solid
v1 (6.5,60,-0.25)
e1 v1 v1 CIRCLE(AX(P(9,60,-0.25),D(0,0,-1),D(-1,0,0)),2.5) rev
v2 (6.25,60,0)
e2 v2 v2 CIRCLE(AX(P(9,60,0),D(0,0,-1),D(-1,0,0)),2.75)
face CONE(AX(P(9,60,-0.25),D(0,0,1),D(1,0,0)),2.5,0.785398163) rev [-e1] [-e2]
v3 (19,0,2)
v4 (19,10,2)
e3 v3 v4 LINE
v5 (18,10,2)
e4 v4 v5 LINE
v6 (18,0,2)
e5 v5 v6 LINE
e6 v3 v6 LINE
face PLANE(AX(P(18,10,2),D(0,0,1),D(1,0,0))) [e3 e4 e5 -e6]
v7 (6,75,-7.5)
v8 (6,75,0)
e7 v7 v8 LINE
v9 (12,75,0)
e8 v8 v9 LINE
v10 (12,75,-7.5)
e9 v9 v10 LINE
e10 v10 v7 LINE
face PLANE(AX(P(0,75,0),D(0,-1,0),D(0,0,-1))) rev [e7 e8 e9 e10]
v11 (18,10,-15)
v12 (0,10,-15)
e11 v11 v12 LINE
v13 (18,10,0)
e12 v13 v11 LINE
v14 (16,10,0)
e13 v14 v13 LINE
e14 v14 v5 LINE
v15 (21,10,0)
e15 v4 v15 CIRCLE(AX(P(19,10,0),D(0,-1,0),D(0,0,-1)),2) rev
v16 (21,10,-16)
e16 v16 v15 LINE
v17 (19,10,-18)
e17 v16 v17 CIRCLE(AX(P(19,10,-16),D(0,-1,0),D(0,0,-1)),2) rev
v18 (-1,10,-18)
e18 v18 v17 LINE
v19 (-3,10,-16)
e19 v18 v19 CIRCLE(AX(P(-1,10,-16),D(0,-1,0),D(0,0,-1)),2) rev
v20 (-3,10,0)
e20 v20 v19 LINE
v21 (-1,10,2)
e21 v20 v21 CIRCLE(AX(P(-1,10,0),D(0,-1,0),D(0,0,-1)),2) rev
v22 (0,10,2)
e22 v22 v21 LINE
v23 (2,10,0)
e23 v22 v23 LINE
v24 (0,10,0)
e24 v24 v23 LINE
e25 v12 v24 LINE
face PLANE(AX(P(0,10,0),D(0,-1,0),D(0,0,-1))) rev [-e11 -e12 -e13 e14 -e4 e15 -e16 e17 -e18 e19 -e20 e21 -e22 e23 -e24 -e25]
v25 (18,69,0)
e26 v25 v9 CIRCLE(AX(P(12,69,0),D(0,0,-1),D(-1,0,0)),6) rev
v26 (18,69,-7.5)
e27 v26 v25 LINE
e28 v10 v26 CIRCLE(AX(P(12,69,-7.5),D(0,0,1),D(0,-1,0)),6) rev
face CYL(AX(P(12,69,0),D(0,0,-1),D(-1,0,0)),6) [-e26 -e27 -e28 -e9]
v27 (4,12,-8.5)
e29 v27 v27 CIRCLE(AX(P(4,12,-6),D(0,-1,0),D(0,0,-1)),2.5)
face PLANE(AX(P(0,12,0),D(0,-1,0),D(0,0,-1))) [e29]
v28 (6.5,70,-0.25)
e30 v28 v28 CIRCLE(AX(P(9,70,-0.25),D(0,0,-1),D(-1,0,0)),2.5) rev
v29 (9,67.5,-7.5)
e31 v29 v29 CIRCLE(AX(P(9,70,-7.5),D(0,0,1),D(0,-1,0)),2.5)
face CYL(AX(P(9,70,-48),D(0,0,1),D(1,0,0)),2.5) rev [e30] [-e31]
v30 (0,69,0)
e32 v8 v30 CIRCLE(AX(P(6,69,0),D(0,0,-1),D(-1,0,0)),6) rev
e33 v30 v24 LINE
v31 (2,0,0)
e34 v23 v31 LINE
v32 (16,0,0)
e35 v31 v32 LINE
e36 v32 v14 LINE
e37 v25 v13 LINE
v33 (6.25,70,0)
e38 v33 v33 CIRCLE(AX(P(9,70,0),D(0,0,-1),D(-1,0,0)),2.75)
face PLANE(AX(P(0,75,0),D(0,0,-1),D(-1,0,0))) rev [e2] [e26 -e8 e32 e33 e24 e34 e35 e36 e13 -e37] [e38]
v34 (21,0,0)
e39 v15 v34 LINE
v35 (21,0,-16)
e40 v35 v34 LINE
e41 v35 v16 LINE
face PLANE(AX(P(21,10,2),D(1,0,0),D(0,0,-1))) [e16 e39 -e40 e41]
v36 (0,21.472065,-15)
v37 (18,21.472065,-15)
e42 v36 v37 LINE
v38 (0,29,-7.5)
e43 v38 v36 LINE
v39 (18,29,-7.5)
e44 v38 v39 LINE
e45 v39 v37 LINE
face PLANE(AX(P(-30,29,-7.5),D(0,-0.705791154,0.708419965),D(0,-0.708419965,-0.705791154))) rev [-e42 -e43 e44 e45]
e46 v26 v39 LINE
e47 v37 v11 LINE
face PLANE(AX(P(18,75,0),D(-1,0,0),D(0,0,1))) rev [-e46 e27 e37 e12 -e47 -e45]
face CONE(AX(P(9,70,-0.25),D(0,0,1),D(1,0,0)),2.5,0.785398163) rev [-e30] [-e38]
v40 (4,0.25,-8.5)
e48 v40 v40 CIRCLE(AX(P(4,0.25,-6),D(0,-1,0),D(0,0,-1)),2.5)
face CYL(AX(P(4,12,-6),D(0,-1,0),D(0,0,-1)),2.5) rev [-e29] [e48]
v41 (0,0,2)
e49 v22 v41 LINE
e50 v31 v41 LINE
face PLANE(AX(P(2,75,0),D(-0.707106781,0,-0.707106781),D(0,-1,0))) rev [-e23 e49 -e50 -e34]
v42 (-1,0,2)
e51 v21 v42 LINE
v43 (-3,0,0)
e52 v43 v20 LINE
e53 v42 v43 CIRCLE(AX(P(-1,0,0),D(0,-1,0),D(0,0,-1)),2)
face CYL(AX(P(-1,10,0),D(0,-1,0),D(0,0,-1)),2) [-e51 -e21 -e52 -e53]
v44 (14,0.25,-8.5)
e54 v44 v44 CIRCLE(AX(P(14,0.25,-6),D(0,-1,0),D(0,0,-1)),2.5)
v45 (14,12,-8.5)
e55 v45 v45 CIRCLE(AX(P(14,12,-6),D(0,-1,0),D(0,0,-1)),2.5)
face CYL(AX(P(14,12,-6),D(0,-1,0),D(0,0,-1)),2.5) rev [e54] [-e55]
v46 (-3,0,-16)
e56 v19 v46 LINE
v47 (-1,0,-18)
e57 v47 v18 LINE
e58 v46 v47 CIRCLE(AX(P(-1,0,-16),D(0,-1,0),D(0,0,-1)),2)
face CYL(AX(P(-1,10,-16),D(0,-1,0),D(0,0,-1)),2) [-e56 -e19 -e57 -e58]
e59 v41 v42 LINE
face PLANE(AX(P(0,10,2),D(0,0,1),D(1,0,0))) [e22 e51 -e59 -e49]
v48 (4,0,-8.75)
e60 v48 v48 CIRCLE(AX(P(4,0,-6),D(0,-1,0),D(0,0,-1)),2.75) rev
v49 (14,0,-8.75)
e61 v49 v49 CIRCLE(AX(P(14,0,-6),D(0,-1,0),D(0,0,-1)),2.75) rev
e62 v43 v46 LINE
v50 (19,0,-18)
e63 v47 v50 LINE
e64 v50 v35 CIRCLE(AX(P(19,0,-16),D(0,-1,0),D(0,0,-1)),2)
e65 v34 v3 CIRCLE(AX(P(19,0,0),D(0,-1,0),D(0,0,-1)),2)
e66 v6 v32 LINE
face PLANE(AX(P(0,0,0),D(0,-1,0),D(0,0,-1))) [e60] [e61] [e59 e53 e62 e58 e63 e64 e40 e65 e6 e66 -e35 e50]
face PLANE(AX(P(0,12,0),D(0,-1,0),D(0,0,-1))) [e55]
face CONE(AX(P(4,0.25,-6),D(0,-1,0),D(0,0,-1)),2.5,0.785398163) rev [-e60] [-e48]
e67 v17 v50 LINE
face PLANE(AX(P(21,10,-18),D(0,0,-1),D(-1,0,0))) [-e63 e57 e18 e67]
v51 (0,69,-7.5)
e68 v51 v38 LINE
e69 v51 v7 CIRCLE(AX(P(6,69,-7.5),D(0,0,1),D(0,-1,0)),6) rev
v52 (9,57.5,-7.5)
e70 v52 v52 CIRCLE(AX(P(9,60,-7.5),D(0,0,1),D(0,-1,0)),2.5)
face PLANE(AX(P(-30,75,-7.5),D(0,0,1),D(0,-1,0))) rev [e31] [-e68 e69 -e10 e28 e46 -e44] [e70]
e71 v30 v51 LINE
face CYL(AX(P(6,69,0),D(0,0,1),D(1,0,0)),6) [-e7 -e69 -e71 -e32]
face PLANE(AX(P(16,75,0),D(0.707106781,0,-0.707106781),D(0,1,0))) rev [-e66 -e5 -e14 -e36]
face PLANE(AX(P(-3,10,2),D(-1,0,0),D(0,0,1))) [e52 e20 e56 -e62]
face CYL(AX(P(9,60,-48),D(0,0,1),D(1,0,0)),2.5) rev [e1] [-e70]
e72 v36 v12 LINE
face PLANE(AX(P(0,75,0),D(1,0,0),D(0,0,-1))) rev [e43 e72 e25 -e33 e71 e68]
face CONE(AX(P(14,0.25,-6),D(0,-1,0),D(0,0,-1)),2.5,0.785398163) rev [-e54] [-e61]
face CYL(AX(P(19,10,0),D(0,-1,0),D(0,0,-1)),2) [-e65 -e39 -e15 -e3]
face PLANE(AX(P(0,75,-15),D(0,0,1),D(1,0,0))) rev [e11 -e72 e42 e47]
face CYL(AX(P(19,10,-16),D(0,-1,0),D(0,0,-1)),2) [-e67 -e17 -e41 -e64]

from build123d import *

# Parameters (mm, degrees)
SKETCH1_W           = 18
SKETCH1_H           = 15
BOSS_EXTRUDE1_DEPTH = 75
SKETCH2_R           = 2.5
CUT_EXTRUDE1_DEPTH  = 12
CUT_EXTRUDE2_DEPTH  = 48
SKETCH4_R           = 2.5
CUT_EXTRUDE3_DEPTH  = 48
FILLET1_R           = 6
BOSS_EXTRUDE2_DEPTH = 10
CHAMFER3_SIZE       = 2
FILLET2_R           = 2
CHAMFER4_SIZE       = 0.25


with BuildPart() as part:
    # Sketch1 → Boss-Extrude1 (new body)
    with BuildSketch(Plane(origin=(0, 0, 0), x_dir=(1, 0, 0), z_dir=(0, 1, 0))):
        with Locations((9, 7.5)):
            Rectangle(SKETCH1_W, SKETCH1_H)
    extrude(amount=BOSS_EXTRUDE1_DEPTH)

    # Sketch2 → Cut-Extrude1 (cut)
    with BuildSketch(Plane.XZ):
        with Locations(Location((14, -6, 0), (0, 0, 270))):
            Circle(SKETCH2_R)
        with Locations(Location((4, -6, 0), (0, 0, 270))):
            Circle(SKETCH2_R)
    extrude(amount=-CUT_EXTRUDE1_DEPTH, mode=Mode.SUBTRACT)

    # Sketch3 → Cut-Extrude2 (cut)
    with BuildSketch(Plane(origin=(18, 0, 0), x_dir=(0, 0, -1), z_dir=(1, 0, 0))):
        Polygon((7.5, 75), (7.5, 29), (15, 21.472065282), (15, 75), align=None)
    extrude(amount=-CUT_EXTRUDE2_DEPTH, mode=Mode.SUBTRACT)

    # Sketch4 → Cut-Extrude3 (cut)
    with BuildSketch(Plane.XY):
        with Locations((9, 70)):
            Circle(SKETCH4_R)
        with Locations((9, 60)):
            Circle(SKETCH4_R)
    extrude(amount=-CUT_EXTRUDE3_DEPTH, mode=Mode.SUBTRACT)

    # Fillet1
    fillet1_edges = [part.edges().sort_by_distance(p)[0] for p in [
        (18, 75, -3.75),
        (0, 75, -3.75),
    ]]
    fillet(fillet1_edges, radius=FILLET1_R)

    # Sketch5 → Boss-Extrude2 (add)
    with BuildSketch(Plane.XZ):
        Polygon((0, 0), (0, 2), (-3, 2), (-3, -18), (21, -18), (21, 2), (18, 2), (18, 0), (18, -15), (0, -15), align=None)
    extrude(amount=-BOSS_EXTRUDE2_DEPTH)

    # Chamfer3
    chamfer3_edges = [part.edges().sort_by_distance(p)[0] for p in [
        (0, 5, 0),
        (18, 5, 0),
    ]]
    chamfer(chamfer3_edges, length=CHAMFER3_SIZE - 0.0001)  # a hair under: the kernel refuses the full size

    # Fillet2
    fillet2_edges = [part.edges().sort_by_distance(p)[0] for p in [
        (21, 5, 2),
        (21, 5, -18),
        (-3, 5, -18),
        (-3, 5, 2),
    ]]
    fillet(fillet2_edges, radius=FILLET2_R)

    # Chamfer4
    chamfer4_edges = [part.edges().sort_by_distance(p)[0] for p in [
        (4, 0, -3.5),
        (14, 0, -3.5),
        (6.5, 70, 0),
        (6.5, 60, 0),
    ]]
    chamfer(chamfer4_edges, length=CHAMFER4_SIZE)


solid = part.part
